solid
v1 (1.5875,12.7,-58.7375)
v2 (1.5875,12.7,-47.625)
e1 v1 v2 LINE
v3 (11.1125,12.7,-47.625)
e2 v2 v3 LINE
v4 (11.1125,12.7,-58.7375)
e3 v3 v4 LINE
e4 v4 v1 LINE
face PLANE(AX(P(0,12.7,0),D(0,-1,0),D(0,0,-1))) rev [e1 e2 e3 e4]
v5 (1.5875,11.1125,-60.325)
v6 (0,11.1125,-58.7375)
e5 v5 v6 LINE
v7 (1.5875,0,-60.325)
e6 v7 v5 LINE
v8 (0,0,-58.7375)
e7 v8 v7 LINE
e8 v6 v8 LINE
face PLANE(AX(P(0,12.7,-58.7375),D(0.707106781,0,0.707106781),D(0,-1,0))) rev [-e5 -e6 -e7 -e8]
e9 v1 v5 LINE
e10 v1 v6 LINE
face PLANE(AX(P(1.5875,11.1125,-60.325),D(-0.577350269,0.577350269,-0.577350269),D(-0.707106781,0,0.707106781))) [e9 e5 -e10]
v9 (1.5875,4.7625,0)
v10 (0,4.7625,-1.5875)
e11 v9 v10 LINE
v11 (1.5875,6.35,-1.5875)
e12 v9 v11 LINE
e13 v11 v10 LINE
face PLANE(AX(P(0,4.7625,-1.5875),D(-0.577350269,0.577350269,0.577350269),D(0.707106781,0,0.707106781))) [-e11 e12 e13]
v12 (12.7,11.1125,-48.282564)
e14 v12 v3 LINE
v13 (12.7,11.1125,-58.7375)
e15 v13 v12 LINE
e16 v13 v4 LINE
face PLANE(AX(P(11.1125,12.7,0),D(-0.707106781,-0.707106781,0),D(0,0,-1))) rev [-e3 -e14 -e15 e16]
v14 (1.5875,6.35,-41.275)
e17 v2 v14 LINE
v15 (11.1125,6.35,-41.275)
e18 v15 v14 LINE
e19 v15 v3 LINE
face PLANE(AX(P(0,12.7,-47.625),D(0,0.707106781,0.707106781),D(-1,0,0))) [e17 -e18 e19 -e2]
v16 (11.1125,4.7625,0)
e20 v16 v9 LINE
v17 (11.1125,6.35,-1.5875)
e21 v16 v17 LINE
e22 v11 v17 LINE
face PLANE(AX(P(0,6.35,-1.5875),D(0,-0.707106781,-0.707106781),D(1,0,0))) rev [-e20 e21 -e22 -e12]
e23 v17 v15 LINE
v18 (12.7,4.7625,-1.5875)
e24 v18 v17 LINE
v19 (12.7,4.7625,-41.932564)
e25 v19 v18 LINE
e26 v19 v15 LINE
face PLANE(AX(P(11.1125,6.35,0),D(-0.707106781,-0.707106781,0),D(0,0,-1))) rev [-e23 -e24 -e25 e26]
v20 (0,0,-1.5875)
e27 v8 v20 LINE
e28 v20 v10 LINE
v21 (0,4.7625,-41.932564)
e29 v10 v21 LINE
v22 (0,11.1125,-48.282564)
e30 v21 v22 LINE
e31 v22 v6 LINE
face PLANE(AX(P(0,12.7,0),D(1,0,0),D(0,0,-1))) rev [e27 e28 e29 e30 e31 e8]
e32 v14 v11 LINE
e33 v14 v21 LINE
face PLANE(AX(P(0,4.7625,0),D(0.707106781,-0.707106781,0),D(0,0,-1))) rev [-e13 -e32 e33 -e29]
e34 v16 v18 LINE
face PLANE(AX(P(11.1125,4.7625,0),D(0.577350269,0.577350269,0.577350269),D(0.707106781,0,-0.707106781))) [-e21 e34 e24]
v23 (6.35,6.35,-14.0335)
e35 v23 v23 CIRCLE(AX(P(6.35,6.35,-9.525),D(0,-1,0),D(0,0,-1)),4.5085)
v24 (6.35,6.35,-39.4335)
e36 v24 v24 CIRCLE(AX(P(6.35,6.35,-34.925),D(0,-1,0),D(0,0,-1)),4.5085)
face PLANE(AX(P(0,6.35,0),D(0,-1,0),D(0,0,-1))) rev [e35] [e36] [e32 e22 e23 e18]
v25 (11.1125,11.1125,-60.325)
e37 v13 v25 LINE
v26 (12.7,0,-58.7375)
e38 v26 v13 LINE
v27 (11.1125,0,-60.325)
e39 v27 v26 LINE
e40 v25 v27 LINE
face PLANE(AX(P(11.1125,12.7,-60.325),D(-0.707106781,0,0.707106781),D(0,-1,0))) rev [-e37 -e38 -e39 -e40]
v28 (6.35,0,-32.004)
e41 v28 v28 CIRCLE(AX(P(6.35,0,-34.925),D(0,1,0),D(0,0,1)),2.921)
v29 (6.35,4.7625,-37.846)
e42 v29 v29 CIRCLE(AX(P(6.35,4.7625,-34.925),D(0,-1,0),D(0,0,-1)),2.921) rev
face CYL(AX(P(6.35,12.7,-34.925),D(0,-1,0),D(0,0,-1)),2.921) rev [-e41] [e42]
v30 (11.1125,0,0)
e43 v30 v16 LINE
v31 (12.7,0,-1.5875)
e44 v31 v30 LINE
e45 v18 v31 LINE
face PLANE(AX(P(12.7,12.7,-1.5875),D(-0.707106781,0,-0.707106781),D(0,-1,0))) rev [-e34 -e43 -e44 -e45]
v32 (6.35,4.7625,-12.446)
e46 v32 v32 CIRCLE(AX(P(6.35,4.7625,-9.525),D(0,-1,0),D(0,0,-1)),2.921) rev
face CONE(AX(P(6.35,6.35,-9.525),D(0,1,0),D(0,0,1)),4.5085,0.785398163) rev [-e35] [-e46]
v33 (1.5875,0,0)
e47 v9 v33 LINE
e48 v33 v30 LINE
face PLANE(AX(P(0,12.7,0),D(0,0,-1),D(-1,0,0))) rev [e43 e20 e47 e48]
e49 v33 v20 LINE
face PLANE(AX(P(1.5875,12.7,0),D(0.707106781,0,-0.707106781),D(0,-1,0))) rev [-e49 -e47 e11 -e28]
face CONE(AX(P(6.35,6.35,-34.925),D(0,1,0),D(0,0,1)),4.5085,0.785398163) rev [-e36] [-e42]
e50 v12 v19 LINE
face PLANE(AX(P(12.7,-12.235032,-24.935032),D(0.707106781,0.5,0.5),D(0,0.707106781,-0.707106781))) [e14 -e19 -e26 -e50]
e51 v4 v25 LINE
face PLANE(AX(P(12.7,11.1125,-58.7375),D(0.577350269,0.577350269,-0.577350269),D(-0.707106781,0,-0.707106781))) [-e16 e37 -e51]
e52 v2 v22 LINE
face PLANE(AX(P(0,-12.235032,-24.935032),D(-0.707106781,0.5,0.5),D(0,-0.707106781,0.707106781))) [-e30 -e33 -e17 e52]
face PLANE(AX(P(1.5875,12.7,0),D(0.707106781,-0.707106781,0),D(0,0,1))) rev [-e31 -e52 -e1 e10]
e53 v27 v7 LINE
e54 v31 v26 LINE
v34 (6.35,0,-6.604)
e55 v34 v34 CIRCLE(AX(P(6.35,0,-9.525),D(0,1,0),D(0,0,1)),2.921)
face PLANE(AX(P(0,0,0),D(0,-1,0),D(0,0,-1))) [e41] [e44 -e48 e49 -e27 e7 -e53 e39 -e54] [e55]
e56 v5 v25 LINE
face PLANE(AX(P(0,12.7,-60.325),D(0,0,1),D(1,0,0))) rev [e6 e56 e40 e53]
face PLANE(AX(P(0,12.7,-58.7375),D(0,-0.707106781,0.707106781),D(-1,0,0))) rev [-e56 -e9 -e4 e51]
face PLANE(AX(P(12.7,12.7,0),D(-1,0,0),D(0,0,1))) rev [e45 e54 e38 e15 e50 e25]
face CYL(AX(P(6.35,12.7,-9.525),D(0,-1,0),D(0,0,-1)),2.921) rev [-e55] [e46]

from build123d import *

# Parameters (mm, degrees)
SKETCH1_W           = 12.7
SKETCH1_H           = 60.325
SKETCH1_R           = 2.921
BOSS_EXTRUDE1_DEPTH = 12.7
SKETCH2_W           = 47.625
SKETCH2_H           = 6.35
CUT_EXTRUDE1_DEPTH  = 63.941922635
CHAMFER1_SIZE       = 6.35


# Some blends are built 0.0001 mm under size
with BuildPart() as part:
    # Sketch1 → Boss-Extrude1 (new body)
    with BuildSketch(Plane(origin=(0, 0, 0), x_dir=(1, 0, 0), z_dir=(0, 1, 0))):
        with Locations((6.35, 30.1625)):
            Rectangle(SKETCH1_W, SKETCH1_H)
        with Locations(Location((6.35, 9.525, 0), (0, 0, 270))):
            Circle(SKETCH1_R, mode=Mode.SUBTRACT)
        with Locations(Location((6.35, 34.925, 0), (0, 0, 270))):
            Circle(SKETCH1_R, mode=Mode.SUBTRACT)
    extrude(amount=BOSS_EXTRUDE1_DEPTH)

    # Sketch2 → Cut-Extrude1 (cut, through all)
    with BuildSketch(Plane(origin=(12.7, 0, 0), x_dir=(0, 0, -1), z_dir=(1, 0, 0))):
        with Locations((23.8125, 9.525)):
            Rectangle(SKETCH2_W, SKETCH2_H)
    extrude(amount=-CUT_EXTRUDE1_DEPTH, mode=Mode.SUBTRACT)

    # Chamfer1
    chamfer1_edges = [part.edges().sort_by_distance(p)[0] for p in [
        (6.35, 6.35, -47.625),
    ]]
    chamfer(chamfer1_edges, length=CHAMFER1_SIZE - 0.0001)  # a hair under: the kernel refuses the full size

    # Chamfer2
    # the kernel refuses this chamfer: 1.5875 mm, written as the material it takes off along each edge
    with BuildSketch(Plane(origin=(11.641666667, 11.641666667, -59.266666667), x_dir=(-0.7071067811865476, 0.7071067811865476, 0), z_dir=(0.5773502691896255, 0.5773502691896255, -0.5773502691896263)), Plane(origin=(1.058333333, 5.291666667, -1.058333333), x_dir=(0.7071067811865476, 0.7071067811865476, 0), z_dir=(-0.5773502691896255, 0.5773502691896255, 0.5773502691896261))) as chamfer2_piece_1:
        Polygon((-1.122532015, 0.648094161), (1.122532015, 0.648094161), (0, -1.296188322), align=None)
    extrude(amount=2.016395815, mode=Mode.SUBTRACT)
    with BuildSketch(Plane(origin=(1.058333333, 11.641666667, -59.266666667), x_dir=(0.7071067811865476, 0.7071067811865476, 0), z_dir=(-0.5773502691896255, 0.5773502691896255, -0.5773502691896263)), Plane(origin=(11.641666667, 5.291666667, -1.058333333), x_dir=(-0.7071067811865476, 0.7071067811865476, 0), z_dir=(0.577350269189626, 0.5773502691896254, 0.5773502691896262))) as chamfer2_piece_2:
        Polygon((-1.122532015, -0.648094161), (1.122532015, -0.648094161), (0, 1.296188322), align=None)
    extrude(amount=2.016395815, mode=Mode.SUBTRACT)
    with BuildSketch(Plane(origin=(16.782546743, 12.7, -60.325), x_dir=(0, 0.027495876610586785, 0.9996219169112966), z_dir=(-1, 0, 0)), Plane(origin=(0, 12.7, -64.407546743), x_dir=(0.9996219169112968, 0.02749587661058674, 0), z_dir=(0, 0, 1)), Plane(origin=(0, -4.082546743, -60.325), x_dir=(0.9996219169112968, 0, -0.02749587661058565), z_dir=(0, 1, 0)), Plane(origin=(12.7, -4.082546743, -60.325), x_dir=(0.027495876610586785, 0, 0.9996219169112966), z_dir=(0, 1, 0))) as chamfer2_piece_3:
        with BuildLine():
            Line((1.633018697, 0), (-0.089768608, -1.630549497))
            Line((-0.089768608, -1.630549497), (-0.121506604, -1.629676503))
            ThreePointArc((-0.121506604, -1.629676503), (-0.054180148, -0.815019055), (-0.031737996, 0.000872994))
            Line((-0.031737996, 0.000872994), (0.000872994, 0.031737996))
            ThreePointArc((0.000872994, 0.031737996), (0.816765043, 0.009295844), (1.633891691, 0.031737996))
            Line((1.633891691, 0.031737996), (1.633018697, 0))
        make_face()
    extrude(amount=20.865093487, mode=Mode.SUBTRACT)
    with BuildSketch(Plane(origin=(12.7, 12.7, -43.542453257), x_dir=(0.027495876610586726, -0.9996219169112968, 0), z_dir=(0, 0, -1)), Plane(origin=(16.782546743, 6.35, 0), x_dir=(0, 0.027495876610586223, -0.9996219169112968), z_dir=(-1, 0, 0))) as chamfer2_piece_4:
        with BuildLine():
            Line((1.633018697, 0), (-0.089768608, 1.630549497))
            Line((-0.089768608, 1.630549497), (-0.121506604, 1.629676503))
            ThreePointArc((-0.121506604, 1.629676503), (-0.054180148, 0.815019055), (-0.031737996, -0.000872994))
            Line((-0.031737996, -0.000872994), (0.000872994, -0.031737996))
            ThreePointArc((0.000872994, -0.031737996), (0.816765043, -0.009295844), (1.633891691, -0.031737996))
            Line((1.633891691, -0.031737996), (1.633018697, 0))
        make_face()
    extrude(amount=20.865093487, mode=Mode.SUBTRACT)
    with BuildSketch(Plane(origin=(12.7, -4.082546743, 0), x_dir=(0.027495876610586743, 0, -0.9996219169112966), z_dir=(0, 1, 0)), Plane(origin=(0, -4.082546743, 0), x_dir=(0.9996219169112966, 0, 0.027495876610586355), z_dir=(0, 1, 0))) as chamfer2_piece_5:
        with BuildLine():
            Line((1.633018697, 0), (-0.089768608, 1.630549497))
            Line((-0.089768608, 1.630549497), (-0.121506604, 1.629676503))
            ThreePointArc((-0.121506604, 1.629676503), (-0.054180148, 0.815019055), (-0.031737996, -0.000872994))
            Line((-0.031737996, -0.000872994), (0.000872994, -0.031737996))
            ThreePointArc((0.000872994, -0.031737996), (0.816765043, -0.009295844), (1.633891691, -0.031737996))
            Line((1.633891691, -0.031737996), (1.633018697, 0))
        make_face()
    extrude(amount=14.515093487, mode=Mode.SUBTRACT)
    with BuildSketch(Plane(origin=(6.35, 6.35, -9.525), x_dir=(0, 0, 1), z_dir=(1, 0, 0))) as chamfer2_piece_6:
        with BuildLine():
            Line((4.553401281, -0.044901281), (2.876098719, 1.632401281))
            Line((2.876098719, 1.632401281), (2.844348719, 1.632401281))
            ThreePointArc((2.844348719, 1.632401281), (2.88925, 0.81620064), (2.88925, 0))
            Line((2.88925, 0), (2.921, -0.03175))
            ThreePointArc((2.921, -0.03175), (3.73720064, -0.03175), (4.553401281, -0.076651281))
            Line((4.553401281, -0.076651281), (4.553401281, -0.044901281))
        make_face()
    revolve(axis=Axis((6.35, 6.35, -9.525), (0, -1, 0)), mode=Mode.SUBTRACT)
    with BuildSketch(Plane(origin=(6.35, 6.35, -34.925), x_dir=(0, 0, 1), z_dir=(1, 0, 0))) as chamfer2_piece_7:
        with BuildLine():
            Line((4.553401281, -0.044901281), (2.876098719, 1.632401281))
            Line((2.876098719, 1.632401281), (2.844348719, 1.632401281))
            ThreePointArc((2.844348719, 1.632401281), (2.88925, 0.81620064), (2.88925, 0))
            Line((2.88925, 0), (2.921, -0.03175))
            ThreePointArc((2.921, -0.03175), (3.73720064, -0.03175), (4.553401281, -0.076651281))
            Line((4.553401281, -0.076651281), (4.553401281, -0.044901281))
        make_face()
    revolve(axis=Axis((6.35, 6.35, -34.925), (0, -1, 0)), mode=Mode.SUBTRACT)
    with BuildSketch(Plane(origin=(0, 6.35, -45.357646743), x_dir=(0.9996219169112968, 0.027495876610586195, 0), z_dir=(0, 0, 1))) as chamfer2_piece_8_section:
        with BuildLine():
            Line((1.633018697, 0), (-0.089768608, -1.630549497))
            Line((-0.089768608, -1.630549497), (-0.121506604, -1.629676503))
            ThreePointArc((-0.121506604, -1.629676503), (-0.054180148, -0.815019055), (-0.031737996, 0.000872994))
            Line((-0.031737996, 0.000872994), (0.000872994, 0.031737996))
            ThreePointArc((0.000872994, 0.031737996), (0.816765043, 0.009295844), (1.633891691, 0.031737996))
            Line((1.633891691, 0.031737996), (1.633018697, 0))
        make_face()
    chamfer2_piece_8 = extrude(amount=49.440193487, mode=Mode.PRIVATE)
    chamfer2_piece_8 = split(chamfer2_piece_8, bisect_by=Plane(origin=(0.525455665, -5.379395081, -29.545704919), z_dir=(0, 0.7071067811865474, 0.7071067811865477)), keep=Keep.TOP, mode=Mode.PRIVATE)
    add(chamfer2_piece_8, mode=Mode.SUBTRACT)
    with BuildSketch(Plane(origin=(12.7, 6.35, -45.357646743), x_dir=(0.02749587661058674, -0.9996219169112966, 0), z_dir=(0, 0, 1))) as chamfer2_piece_9_section:
        with BuildLine():
            Line((1.633018697, 0), (-0.089768608, -1.630549497))
            Line((-0.089768608, -1.630549497), (-0.121506604, -1.629676503))
            ThreePointArc((-0.121506604, -1.629676503), (-0.054180148, -0.815019055), (-0.031737996, 0.000872994))
            Line((-0.031737996, 0.000872994), (0.000872994, 0.031737996))
            ThreePointArc((0.000872994, 0.031737996), (0.816765043, 0.009295844), (1.633891691, 0.031737996))
            Line((1.633891691, 0.031737996), (1.633018697, 0))
        make_face()
    chamfer2_piece_9 = extrude(amount=49.440193487, mode=Mode.PRIVATE)
    chamfer2_piece_9 = split(chamfer2_piece_9, bisect_by=Plane(origin=(12.174544335, -5.379395081, -29.545704919), z_dir=(0, 0.7071067811865474, 0.7071067811865477)), keep=Keep.TOP, mode=Mode.PRIVATE)
    add(chamfer2_piece_9, mode=Mode.SUBTRACT)
    with BuildSketch(Plane(origin=(12.7, 3.463203513, -38.388303513), x_dir=(0.027495876610586726, -0.7068394360706733, -0.7068394360706737), z_dir=(0, 0.7071067811865477, -0.7071067811865474))) as chamfer2_piece_10_section:
        with BuildLine():
            Line((1.633018697, 0), (-0.089768608, 1.630549497))
            Line((-0.089768608, 1.630549497), (-0.121506604, 1.629676503))
            ThreePointArc((-0.121506604, 1.629676503), (-0.054180148, 0.815019055), (-0.031737996, -0.000872994))
            Line((-0.031737996, -0.000872994), (0.000872994, -0.031737996))
            ThreePointArc((0.000872994, -0.031737996), (0.816765043, -0.009295844), (1.633891691, -0.031737996))
            Line((1.633891691, -0.031737996), (1.633018697, 0))
        make_face()
    chamfer2_piece_10 = extrude(amount=17.145208187, mode=Mode.PRIVATE)
    chamfer2_piece_10 = split(chamfer2_piece_10, bisect_by=Plane(origin=(12.154882998, 6.35, -44.791724347), z_dir=(0, 1, 0)), keep=Keep.TOP, mode=Mode.PRIVATE)
    add(chamfer2_piece_10, mode=Mode.SUBTRACT)
    with BuildSketch(Plane(origin=(0, 3.463203513, -38.388303513), x_dir=(0.9996219169112968, 0.019442520806014982, 0.019442520806014992), z_dir=(0, 0.7071067811865477, -0.7071067811865474))) as chamfer2_piece_11_section:
        with BuildLine():
            Line((1.633018697, 0), (-0.089768608, 1.630549497))
            Line((-0.089768608, 1.630549497), (-0.121506604, 1.629676503))
            ThreePointArc((-0.121506604, 1.629676503), (-0.054180148, 0.815019055), (-0.031737996, -0.000872994))
            Line((-0.031737996, -0.000872994), (0.000872994, -0.031737996))
            ThreePointArc((0.000872994, -0.031737996), (0.816765043, -0.009295844), (1.633891691, -0.031737996))
            Line((1.633891691, -0.031737996), (1.633018697, 0))
        make_face()
    chamfer2_piece_11 = extrude(amount=17.145208187, mode=Mode.PRIVATE)
    chamfer2_piece_11 = split(chamfer2_piece_11, bisect_by=Plane(origin=(0.545117002, 6.35, -44.791724347), z_dir=(0, 1, 0)), keep=Keep.TOP, mode=Mode.PRIVATE)
    add(chamfer2_piece_11, mode=Mode.SUBTRACT)
    with BuildSketch(Plane(origin=(0, 3.463203513, -38.388303513), x_dir=(0.9996219169112968, 0.019442520806014982, 0.019442520806014992), z_dir=(0, 0.7071067811865477, -0.7071067811865474))) as chamfer2_piece_12a_section:
        with BuildLine():
            Line((1.633018697, 0), (-0.089768608, 1.630549497))
            Line((-0.089768608, 1.630549497), (-0.121506604, 1.629676503))
            ThreePointArc((-0.121506604, 1.629676503), (-0.054180148, 0.815019055), (-0.031737996, -0.000872994))
            Line((-0.031737996, -0.000872994), (0.000872994, -0.031737996))
            ThreePointArc((0.000872994, -0.031737996), (0.816765043, -0.009295844), (1.633891691, -0.031737996))
            Line((1.633891691, -0.031737996), (1.633018697, 0))
        make_face()
    chamfer2_piece_12a = extrude(amount=17.145208187, mode=Mode.PRIVATE)
    chamfer2_piece_12a = split(chamfer2_piece_12a, bisect_by=Plane(origin=(0.504972836, 6.35, -40.423859696), z_dir=(0, -1, 0)), keep=Keep.TOP, mode=Mode.PRIVATE)
    with BuildSketch(Plane(origin=(0, 6.35, -45.357646743), x_dir=(0.9996219169112968, 0.027495876610586195, 0), z_dir=(0, 0, 1))) as chamfer2_piece_12b_section:
        with BuildLine():
            Line((1.633018697, 0), (-0.089768608, -1.630549497))
            Line((-0.089768608, -1.630549497), (-0.121506604, -1.629676503))
            ThreePointArc((-0.121506604, -1.629676503), (-0.054180148, -0.815019055), (-0.031737996, 0.000872994))
            Line((-0.031737996, 0.000872994), (0.000872994, 0.031737996))
            ThreePointArc((0.000872994, 0.031737996), (0.816765043, 0.009295844), (1.633891691, 0.031737996))
            Line((1.633891691, 0.031737996), (1.633018697, 0))
        make_face()
    chamfer2_piece_12b = extrude(amount=49.440193487, mode=Mode.PRIVATE)
    chamfer2_piece_12b = split(chamfer2_piece_12b, bisect_by=Plane(origin=(0.504972836, 6.951917791, -41.877017791), z_dir=(0, -0.7071067811865474, -0.7071067811865477)), keep=Keep.TOP, mode=Mode.PRIVATE)
    chamfer2_piece_12 = chamfer2_piece_12a & chamfer2_piece_12b
    add(chamfer2_piece_12, mode=Mode.SUBTRACT)
    with BuildSketch(Plane(origin=(12.7, 3.463203513, -38.388303513), x_dir=(0.027495876610586726, -0.7068394360706733, -0.7068394360706737), z_dir=(0, 0.7071067811865477, -0.7071067811865474))) as chamfer2_piece_13a_section:
        with BuildLine():
            Line((1.633018697, 0), (-0.089768608, 1.630549497))
            Line((-0.089768608, 1.630549497), (-0.121506604, 1.629676503))
            ThreePointArc((-0.121506604, 1.629676503), (-0.054180148, 0.815019055), (-0.031737996, -0.000872994))
            Line((-0.031737996, -0.000872994), (0.000872994, -0.031737996))
            ThreePointArc((0.000872994, -0.031737996), (0.816765043, -0.009295844), (1.633891691, -0.031737996))
            Line((1.633891691, -0.031737996), (1.633018697, 0))
        make_face()
    chamfer2_piece_13a = extrude(amount=17.145208187, mode=Mode.PRIVATE)
    chamfer2_piece_13a = split(chamfer2_piece_13a, bisect_by=Plane(origin=(12.195027164, 6.35, -40.423859696), z_dir=(0, -1, 0)), keep=Keep.TOP, mode=Mode.PRIVATE)
    with BuildSketch(Plane(origin=(12.7, 6.35, -45.357646743), x_dir=(0.02749587661058674, -0.9996219169112966, 0), z_dir=(0, 0, 1))) as chamfer2_piece_13b_section:
        with BuildLine():
            Line((1.633018697, 0), (-0.089768608, -1.630549497))
            Line((-0.089768608, -1.630549497), (-0.121506604, -1.629676503))
            ThreePointArc((-0.121506604, -1.629676503), (-0.054180148, -0.815019055), (-0.031737996, 0.000872994))
            Line((-0.031737996, 0.000872994), (0.000872994, 0.031737996))
            ThreePointArc((0.000872994, 0.031737996), (0.816765043, 0.009295844), (1.633891691, 0.031737996))
            Line((1.633891691, 0.031737996), (1.633018697, 0))
        make_face()
    chamfer2_piece_13b = extrude(amount=49.440193487, mode=Mode.PRIVATE)
    chamfer2_piece_13b = split(chamfer2_piece_13b, bisect_by=Plane(origin=(12.195027164, 6.951917791, -41.877017791), z_dir=(0, -0.7071067811865474, -0.7071067811865477)), keep=Keep.TOP, mode=Mode.PRIVATE)
    chamfer2_piece_13 = chamfer2_piece_13a & chamfer2_piece_13b
    add(chamfer2_piece_13, mode=Mode.SUBTRACT)


solid = part.part
